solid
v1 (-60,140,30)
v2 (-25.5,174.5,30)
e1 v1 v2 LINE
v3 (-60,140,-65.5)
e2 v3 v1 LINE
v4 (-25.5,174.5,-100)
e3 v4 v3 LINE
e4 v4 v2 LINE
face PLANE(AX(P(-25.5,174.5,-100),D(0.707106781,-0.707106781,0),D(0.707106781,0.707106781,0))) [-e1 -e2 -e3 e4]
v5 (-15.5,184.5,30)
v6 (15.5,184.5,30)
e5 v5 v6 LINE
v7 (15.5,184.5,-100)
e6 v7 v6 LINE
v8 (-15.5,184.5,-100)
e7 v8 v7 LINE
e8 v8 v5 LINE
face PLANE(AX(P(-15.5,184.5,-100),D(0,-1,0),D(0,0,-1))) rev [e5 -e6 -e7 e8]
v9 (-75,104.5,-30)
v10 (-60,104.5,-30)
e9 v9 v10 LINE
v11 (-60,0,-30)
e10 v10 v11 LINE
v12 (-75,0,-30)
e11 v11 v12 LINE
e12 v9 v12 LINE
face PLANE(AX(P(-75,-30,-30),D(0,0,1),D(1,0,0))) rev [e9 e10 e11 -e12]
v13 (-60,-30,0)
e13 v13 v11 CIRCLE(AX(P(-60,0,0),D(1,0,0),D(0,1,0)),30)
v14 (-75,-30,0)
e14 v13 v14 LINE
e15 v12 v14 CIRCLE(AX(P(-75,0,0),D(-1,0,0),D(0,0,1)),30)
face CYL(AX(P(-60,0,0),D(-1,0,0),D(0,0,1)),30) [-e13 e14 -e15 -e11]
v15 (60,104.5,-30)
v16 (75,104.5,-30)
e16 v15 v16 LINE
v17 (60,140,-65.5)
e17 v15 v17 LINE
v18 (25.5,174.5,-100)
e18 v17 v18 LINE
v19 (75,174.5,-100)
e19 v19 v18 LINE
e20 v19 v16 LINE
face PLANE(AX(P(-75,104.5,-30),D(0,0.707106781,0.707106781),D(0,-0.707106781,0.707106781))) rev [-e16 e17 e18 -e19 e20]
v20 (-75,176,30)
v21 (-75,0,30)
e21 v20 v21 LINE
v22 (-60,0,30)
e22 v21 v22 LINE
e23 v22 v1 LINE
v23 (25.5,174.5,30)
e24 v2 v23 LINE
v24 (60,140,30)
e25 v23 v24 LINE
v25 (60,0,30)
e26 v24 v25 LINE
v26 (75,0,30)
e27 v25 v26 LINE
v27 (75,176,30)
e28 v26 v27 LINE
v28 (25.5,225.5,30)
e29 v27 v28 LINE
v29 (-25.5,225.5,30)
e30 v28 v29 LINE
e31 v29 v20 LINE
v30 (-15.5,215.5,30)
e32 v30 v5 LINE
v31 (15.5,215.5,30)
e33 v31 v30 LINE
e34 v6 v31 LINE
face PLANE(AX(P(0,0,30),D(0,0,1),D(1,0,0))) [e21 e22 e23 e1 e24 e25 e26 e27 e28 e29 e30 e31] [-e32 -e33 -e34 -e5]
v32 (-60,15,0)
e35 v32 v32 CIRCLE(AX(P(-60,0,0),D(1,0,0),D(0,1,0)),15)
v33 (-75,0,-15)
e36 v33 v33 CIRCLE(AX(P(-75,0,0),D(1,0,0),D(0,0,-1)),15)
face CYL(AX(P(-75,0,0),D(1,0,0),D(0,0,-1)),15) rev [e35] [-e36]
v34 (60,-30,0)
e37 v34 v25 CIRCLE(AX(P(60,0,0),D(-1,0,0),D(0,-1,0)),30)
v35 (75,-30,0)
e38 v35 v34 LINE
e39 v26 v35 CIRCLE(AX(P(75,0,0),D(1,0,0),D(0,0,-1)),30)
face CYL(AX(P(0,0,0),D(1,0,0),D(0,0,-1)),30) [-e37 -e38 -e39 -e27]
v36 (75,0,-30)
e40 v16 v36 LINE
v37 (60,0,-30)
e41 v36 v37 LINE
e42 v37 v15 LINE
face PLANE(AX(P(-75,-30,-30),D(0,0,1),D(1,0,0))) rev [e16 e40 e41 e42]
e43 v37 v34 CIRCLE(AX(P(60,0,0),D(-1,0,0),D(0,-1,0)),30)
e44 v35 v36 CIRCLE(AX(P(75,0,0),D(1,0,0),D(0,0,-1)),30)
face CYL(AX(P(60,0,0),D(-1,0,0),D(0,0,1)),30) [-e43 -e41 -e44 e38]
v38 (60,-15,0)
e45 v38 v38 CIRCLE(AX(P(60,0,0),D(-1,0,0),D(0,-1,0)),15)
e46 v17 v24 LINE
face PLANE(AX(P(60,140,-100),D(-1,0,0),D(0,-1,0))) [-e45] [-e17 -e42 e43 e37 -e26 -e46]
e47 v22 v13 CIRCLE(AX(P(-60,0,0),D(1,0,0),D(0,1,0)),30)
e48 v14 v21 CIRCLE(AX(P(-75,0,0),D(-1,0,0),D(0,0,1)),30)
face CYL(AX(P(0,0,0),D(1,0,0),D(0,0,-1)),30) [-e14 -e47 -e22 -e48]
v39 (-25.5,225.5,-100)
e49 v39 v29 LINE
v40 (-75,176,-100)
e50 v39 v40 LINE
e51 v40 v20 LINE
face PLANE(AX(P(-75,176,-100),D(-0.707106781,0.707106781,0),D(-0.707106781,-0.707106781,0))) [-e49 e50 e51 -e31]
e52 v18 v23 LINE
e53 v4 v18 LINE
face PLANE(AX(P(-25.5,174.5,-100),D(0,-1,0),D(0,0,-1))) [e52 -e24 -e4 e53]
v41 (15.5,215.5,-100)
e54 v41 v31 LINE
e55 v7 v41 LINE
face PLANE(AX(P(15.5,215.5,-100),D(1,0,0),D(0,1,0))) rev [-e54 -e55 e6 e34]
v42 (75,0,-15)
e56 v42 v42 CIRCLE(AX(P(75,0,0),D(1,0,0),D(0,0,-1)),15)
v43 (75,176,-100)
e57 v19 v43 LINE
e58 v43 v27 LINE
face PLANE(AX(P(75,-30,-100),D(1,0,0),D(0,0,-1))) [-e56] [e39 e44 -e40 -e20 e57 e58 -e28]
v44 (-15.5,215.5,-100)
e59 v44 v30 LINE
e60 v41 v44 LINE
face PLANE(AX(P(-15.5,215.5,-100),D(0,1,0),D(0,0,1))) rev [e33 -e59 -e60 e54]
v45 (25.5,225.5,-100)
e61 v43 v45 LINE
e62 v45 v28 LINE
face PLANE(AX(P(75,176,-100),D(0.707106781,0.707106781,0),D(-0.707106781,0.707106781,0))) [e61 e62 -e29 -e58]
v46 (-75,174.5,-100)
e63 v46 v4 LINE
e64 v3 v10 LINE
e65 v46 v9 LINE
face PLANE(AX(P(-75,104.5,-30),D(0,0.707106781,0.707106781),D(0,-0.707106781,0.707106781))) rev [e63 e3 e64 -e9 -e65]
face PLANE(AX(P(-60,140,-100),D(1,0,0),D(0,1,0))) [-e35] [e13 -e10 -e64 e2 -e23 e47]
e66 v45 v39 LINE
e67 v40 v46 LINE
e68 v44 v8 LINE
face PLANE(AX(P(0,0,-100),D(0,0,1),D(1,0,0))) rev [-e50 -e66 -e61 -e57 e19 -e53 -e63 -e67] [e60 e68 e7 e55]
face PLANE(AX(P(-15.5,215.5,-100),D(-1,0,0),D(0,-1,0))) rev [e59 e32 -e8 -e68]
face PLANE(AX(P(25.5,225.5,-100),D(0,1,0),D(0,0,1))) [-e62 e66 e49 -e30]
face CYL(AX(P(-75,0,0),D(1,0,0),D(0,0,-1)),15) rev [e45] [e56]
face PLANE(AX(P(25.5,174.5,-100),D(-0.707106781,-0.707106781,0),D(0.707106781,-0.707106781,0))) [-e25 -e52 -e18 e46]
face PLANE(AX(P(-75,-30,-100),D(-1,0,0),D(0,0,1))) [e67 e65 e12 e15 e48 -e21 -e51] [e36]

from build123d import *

# Parameters (mm, degrees)
BOSS_EXTRUDE1_DEPTH      = 30
BOSS_EXTRUDE1_DEPTH_BACK = 100
SKETCH2_W                = 31
SKETCH2_H                = 31
CUT_EXTRUDE1_DEPTH       = 258.827946507
CUT_EXTRUDE1_DEPTH_BACK  = 258.827946507
CUT_EXTRUDE2_DEPTH       = 258.827946507
CUT_EXTRUDE2_DEPTH_BACK  = 258.827946507
SKETCH4_R                = 15
FILLET1_R                = 30


with BuildPart() as part:
    # Sketch2 → Boss-Extrude1 (new, two sides: drawn at the far end of the back side and taken through both)
    with BuildSketch(Plane.XY.offset(-BOSS_EXTRUDE1_DEPTH_BACK)):
        Polygon((-25.5, 174.5), (25.5, 174.5), (60, 140), (60, -30), (75, -30), (75, 176), (25.5, 225.5), (-25.5, 225.5), (-75, 176), (-75, -30), (-60, -30), (-60, 140), align=None)
        with Locations((0, 200)):
            Rectangle(SKETCH2_W, SKETCH2_H, mode=Mode.SUBTRACT)
    extrude(amount=BOSS_EXTRUDE1_DEPTH + BOSS_EXTRUDE1_DEPTH_BACK)

    # Sketch3 → Cut-Extrude1 (cut, two sides: drawn at the far end of the back side and taken through both)
    with BuildSketch(Plane(origin=(0, 0, 0), x_dir=(0, 0, -1), z_dir=(1, 0, 0)).offset(-CUT_EXTRUDE1_DEPTH_BACK)):
        Polygon((30, -30), (30, 104.5), (100, 174.5), (100, -30), align=None)
    extrude(amount=CUT_EXTRUDE1_DEPTH + CUT_EXTRUDE1_DEPTH_BACK, mode=Mode.SUBTRACT)

    # Sketch4 → Cut-Extrude2 (cut, two sides: drawn at the far end of the back side and taken through both)
    with BuildSketch(Plane(origin=(0, 0, 0), x_dir=(0, 0, -1), z_dir=(1, 0, 0)).offset(-CUT_EXTRUDE2_DEPTH_BACK)):
        Circle(SKETCH4_R)
    extrude(amount=CUT_EXTRUDE2_DEPTH + CUT_EXTRUDE2_DEPTH_BACK, mode=Mode.SUBTRACT)

    # Fillet1
    fillet1_edges = [part.edges().sort_by_distance(p)[0] for p in [
        (67.5, -30, -30),
        (-67.5, -30, -30),
        (-67.5, -30, 30),
        (67.5, -30, 30),
    ]]
    fillet(fillet1_edges, radius=FILLET1_R - 0.0001)  # a hair under: the kernel refuses the full size


solid = part.part
